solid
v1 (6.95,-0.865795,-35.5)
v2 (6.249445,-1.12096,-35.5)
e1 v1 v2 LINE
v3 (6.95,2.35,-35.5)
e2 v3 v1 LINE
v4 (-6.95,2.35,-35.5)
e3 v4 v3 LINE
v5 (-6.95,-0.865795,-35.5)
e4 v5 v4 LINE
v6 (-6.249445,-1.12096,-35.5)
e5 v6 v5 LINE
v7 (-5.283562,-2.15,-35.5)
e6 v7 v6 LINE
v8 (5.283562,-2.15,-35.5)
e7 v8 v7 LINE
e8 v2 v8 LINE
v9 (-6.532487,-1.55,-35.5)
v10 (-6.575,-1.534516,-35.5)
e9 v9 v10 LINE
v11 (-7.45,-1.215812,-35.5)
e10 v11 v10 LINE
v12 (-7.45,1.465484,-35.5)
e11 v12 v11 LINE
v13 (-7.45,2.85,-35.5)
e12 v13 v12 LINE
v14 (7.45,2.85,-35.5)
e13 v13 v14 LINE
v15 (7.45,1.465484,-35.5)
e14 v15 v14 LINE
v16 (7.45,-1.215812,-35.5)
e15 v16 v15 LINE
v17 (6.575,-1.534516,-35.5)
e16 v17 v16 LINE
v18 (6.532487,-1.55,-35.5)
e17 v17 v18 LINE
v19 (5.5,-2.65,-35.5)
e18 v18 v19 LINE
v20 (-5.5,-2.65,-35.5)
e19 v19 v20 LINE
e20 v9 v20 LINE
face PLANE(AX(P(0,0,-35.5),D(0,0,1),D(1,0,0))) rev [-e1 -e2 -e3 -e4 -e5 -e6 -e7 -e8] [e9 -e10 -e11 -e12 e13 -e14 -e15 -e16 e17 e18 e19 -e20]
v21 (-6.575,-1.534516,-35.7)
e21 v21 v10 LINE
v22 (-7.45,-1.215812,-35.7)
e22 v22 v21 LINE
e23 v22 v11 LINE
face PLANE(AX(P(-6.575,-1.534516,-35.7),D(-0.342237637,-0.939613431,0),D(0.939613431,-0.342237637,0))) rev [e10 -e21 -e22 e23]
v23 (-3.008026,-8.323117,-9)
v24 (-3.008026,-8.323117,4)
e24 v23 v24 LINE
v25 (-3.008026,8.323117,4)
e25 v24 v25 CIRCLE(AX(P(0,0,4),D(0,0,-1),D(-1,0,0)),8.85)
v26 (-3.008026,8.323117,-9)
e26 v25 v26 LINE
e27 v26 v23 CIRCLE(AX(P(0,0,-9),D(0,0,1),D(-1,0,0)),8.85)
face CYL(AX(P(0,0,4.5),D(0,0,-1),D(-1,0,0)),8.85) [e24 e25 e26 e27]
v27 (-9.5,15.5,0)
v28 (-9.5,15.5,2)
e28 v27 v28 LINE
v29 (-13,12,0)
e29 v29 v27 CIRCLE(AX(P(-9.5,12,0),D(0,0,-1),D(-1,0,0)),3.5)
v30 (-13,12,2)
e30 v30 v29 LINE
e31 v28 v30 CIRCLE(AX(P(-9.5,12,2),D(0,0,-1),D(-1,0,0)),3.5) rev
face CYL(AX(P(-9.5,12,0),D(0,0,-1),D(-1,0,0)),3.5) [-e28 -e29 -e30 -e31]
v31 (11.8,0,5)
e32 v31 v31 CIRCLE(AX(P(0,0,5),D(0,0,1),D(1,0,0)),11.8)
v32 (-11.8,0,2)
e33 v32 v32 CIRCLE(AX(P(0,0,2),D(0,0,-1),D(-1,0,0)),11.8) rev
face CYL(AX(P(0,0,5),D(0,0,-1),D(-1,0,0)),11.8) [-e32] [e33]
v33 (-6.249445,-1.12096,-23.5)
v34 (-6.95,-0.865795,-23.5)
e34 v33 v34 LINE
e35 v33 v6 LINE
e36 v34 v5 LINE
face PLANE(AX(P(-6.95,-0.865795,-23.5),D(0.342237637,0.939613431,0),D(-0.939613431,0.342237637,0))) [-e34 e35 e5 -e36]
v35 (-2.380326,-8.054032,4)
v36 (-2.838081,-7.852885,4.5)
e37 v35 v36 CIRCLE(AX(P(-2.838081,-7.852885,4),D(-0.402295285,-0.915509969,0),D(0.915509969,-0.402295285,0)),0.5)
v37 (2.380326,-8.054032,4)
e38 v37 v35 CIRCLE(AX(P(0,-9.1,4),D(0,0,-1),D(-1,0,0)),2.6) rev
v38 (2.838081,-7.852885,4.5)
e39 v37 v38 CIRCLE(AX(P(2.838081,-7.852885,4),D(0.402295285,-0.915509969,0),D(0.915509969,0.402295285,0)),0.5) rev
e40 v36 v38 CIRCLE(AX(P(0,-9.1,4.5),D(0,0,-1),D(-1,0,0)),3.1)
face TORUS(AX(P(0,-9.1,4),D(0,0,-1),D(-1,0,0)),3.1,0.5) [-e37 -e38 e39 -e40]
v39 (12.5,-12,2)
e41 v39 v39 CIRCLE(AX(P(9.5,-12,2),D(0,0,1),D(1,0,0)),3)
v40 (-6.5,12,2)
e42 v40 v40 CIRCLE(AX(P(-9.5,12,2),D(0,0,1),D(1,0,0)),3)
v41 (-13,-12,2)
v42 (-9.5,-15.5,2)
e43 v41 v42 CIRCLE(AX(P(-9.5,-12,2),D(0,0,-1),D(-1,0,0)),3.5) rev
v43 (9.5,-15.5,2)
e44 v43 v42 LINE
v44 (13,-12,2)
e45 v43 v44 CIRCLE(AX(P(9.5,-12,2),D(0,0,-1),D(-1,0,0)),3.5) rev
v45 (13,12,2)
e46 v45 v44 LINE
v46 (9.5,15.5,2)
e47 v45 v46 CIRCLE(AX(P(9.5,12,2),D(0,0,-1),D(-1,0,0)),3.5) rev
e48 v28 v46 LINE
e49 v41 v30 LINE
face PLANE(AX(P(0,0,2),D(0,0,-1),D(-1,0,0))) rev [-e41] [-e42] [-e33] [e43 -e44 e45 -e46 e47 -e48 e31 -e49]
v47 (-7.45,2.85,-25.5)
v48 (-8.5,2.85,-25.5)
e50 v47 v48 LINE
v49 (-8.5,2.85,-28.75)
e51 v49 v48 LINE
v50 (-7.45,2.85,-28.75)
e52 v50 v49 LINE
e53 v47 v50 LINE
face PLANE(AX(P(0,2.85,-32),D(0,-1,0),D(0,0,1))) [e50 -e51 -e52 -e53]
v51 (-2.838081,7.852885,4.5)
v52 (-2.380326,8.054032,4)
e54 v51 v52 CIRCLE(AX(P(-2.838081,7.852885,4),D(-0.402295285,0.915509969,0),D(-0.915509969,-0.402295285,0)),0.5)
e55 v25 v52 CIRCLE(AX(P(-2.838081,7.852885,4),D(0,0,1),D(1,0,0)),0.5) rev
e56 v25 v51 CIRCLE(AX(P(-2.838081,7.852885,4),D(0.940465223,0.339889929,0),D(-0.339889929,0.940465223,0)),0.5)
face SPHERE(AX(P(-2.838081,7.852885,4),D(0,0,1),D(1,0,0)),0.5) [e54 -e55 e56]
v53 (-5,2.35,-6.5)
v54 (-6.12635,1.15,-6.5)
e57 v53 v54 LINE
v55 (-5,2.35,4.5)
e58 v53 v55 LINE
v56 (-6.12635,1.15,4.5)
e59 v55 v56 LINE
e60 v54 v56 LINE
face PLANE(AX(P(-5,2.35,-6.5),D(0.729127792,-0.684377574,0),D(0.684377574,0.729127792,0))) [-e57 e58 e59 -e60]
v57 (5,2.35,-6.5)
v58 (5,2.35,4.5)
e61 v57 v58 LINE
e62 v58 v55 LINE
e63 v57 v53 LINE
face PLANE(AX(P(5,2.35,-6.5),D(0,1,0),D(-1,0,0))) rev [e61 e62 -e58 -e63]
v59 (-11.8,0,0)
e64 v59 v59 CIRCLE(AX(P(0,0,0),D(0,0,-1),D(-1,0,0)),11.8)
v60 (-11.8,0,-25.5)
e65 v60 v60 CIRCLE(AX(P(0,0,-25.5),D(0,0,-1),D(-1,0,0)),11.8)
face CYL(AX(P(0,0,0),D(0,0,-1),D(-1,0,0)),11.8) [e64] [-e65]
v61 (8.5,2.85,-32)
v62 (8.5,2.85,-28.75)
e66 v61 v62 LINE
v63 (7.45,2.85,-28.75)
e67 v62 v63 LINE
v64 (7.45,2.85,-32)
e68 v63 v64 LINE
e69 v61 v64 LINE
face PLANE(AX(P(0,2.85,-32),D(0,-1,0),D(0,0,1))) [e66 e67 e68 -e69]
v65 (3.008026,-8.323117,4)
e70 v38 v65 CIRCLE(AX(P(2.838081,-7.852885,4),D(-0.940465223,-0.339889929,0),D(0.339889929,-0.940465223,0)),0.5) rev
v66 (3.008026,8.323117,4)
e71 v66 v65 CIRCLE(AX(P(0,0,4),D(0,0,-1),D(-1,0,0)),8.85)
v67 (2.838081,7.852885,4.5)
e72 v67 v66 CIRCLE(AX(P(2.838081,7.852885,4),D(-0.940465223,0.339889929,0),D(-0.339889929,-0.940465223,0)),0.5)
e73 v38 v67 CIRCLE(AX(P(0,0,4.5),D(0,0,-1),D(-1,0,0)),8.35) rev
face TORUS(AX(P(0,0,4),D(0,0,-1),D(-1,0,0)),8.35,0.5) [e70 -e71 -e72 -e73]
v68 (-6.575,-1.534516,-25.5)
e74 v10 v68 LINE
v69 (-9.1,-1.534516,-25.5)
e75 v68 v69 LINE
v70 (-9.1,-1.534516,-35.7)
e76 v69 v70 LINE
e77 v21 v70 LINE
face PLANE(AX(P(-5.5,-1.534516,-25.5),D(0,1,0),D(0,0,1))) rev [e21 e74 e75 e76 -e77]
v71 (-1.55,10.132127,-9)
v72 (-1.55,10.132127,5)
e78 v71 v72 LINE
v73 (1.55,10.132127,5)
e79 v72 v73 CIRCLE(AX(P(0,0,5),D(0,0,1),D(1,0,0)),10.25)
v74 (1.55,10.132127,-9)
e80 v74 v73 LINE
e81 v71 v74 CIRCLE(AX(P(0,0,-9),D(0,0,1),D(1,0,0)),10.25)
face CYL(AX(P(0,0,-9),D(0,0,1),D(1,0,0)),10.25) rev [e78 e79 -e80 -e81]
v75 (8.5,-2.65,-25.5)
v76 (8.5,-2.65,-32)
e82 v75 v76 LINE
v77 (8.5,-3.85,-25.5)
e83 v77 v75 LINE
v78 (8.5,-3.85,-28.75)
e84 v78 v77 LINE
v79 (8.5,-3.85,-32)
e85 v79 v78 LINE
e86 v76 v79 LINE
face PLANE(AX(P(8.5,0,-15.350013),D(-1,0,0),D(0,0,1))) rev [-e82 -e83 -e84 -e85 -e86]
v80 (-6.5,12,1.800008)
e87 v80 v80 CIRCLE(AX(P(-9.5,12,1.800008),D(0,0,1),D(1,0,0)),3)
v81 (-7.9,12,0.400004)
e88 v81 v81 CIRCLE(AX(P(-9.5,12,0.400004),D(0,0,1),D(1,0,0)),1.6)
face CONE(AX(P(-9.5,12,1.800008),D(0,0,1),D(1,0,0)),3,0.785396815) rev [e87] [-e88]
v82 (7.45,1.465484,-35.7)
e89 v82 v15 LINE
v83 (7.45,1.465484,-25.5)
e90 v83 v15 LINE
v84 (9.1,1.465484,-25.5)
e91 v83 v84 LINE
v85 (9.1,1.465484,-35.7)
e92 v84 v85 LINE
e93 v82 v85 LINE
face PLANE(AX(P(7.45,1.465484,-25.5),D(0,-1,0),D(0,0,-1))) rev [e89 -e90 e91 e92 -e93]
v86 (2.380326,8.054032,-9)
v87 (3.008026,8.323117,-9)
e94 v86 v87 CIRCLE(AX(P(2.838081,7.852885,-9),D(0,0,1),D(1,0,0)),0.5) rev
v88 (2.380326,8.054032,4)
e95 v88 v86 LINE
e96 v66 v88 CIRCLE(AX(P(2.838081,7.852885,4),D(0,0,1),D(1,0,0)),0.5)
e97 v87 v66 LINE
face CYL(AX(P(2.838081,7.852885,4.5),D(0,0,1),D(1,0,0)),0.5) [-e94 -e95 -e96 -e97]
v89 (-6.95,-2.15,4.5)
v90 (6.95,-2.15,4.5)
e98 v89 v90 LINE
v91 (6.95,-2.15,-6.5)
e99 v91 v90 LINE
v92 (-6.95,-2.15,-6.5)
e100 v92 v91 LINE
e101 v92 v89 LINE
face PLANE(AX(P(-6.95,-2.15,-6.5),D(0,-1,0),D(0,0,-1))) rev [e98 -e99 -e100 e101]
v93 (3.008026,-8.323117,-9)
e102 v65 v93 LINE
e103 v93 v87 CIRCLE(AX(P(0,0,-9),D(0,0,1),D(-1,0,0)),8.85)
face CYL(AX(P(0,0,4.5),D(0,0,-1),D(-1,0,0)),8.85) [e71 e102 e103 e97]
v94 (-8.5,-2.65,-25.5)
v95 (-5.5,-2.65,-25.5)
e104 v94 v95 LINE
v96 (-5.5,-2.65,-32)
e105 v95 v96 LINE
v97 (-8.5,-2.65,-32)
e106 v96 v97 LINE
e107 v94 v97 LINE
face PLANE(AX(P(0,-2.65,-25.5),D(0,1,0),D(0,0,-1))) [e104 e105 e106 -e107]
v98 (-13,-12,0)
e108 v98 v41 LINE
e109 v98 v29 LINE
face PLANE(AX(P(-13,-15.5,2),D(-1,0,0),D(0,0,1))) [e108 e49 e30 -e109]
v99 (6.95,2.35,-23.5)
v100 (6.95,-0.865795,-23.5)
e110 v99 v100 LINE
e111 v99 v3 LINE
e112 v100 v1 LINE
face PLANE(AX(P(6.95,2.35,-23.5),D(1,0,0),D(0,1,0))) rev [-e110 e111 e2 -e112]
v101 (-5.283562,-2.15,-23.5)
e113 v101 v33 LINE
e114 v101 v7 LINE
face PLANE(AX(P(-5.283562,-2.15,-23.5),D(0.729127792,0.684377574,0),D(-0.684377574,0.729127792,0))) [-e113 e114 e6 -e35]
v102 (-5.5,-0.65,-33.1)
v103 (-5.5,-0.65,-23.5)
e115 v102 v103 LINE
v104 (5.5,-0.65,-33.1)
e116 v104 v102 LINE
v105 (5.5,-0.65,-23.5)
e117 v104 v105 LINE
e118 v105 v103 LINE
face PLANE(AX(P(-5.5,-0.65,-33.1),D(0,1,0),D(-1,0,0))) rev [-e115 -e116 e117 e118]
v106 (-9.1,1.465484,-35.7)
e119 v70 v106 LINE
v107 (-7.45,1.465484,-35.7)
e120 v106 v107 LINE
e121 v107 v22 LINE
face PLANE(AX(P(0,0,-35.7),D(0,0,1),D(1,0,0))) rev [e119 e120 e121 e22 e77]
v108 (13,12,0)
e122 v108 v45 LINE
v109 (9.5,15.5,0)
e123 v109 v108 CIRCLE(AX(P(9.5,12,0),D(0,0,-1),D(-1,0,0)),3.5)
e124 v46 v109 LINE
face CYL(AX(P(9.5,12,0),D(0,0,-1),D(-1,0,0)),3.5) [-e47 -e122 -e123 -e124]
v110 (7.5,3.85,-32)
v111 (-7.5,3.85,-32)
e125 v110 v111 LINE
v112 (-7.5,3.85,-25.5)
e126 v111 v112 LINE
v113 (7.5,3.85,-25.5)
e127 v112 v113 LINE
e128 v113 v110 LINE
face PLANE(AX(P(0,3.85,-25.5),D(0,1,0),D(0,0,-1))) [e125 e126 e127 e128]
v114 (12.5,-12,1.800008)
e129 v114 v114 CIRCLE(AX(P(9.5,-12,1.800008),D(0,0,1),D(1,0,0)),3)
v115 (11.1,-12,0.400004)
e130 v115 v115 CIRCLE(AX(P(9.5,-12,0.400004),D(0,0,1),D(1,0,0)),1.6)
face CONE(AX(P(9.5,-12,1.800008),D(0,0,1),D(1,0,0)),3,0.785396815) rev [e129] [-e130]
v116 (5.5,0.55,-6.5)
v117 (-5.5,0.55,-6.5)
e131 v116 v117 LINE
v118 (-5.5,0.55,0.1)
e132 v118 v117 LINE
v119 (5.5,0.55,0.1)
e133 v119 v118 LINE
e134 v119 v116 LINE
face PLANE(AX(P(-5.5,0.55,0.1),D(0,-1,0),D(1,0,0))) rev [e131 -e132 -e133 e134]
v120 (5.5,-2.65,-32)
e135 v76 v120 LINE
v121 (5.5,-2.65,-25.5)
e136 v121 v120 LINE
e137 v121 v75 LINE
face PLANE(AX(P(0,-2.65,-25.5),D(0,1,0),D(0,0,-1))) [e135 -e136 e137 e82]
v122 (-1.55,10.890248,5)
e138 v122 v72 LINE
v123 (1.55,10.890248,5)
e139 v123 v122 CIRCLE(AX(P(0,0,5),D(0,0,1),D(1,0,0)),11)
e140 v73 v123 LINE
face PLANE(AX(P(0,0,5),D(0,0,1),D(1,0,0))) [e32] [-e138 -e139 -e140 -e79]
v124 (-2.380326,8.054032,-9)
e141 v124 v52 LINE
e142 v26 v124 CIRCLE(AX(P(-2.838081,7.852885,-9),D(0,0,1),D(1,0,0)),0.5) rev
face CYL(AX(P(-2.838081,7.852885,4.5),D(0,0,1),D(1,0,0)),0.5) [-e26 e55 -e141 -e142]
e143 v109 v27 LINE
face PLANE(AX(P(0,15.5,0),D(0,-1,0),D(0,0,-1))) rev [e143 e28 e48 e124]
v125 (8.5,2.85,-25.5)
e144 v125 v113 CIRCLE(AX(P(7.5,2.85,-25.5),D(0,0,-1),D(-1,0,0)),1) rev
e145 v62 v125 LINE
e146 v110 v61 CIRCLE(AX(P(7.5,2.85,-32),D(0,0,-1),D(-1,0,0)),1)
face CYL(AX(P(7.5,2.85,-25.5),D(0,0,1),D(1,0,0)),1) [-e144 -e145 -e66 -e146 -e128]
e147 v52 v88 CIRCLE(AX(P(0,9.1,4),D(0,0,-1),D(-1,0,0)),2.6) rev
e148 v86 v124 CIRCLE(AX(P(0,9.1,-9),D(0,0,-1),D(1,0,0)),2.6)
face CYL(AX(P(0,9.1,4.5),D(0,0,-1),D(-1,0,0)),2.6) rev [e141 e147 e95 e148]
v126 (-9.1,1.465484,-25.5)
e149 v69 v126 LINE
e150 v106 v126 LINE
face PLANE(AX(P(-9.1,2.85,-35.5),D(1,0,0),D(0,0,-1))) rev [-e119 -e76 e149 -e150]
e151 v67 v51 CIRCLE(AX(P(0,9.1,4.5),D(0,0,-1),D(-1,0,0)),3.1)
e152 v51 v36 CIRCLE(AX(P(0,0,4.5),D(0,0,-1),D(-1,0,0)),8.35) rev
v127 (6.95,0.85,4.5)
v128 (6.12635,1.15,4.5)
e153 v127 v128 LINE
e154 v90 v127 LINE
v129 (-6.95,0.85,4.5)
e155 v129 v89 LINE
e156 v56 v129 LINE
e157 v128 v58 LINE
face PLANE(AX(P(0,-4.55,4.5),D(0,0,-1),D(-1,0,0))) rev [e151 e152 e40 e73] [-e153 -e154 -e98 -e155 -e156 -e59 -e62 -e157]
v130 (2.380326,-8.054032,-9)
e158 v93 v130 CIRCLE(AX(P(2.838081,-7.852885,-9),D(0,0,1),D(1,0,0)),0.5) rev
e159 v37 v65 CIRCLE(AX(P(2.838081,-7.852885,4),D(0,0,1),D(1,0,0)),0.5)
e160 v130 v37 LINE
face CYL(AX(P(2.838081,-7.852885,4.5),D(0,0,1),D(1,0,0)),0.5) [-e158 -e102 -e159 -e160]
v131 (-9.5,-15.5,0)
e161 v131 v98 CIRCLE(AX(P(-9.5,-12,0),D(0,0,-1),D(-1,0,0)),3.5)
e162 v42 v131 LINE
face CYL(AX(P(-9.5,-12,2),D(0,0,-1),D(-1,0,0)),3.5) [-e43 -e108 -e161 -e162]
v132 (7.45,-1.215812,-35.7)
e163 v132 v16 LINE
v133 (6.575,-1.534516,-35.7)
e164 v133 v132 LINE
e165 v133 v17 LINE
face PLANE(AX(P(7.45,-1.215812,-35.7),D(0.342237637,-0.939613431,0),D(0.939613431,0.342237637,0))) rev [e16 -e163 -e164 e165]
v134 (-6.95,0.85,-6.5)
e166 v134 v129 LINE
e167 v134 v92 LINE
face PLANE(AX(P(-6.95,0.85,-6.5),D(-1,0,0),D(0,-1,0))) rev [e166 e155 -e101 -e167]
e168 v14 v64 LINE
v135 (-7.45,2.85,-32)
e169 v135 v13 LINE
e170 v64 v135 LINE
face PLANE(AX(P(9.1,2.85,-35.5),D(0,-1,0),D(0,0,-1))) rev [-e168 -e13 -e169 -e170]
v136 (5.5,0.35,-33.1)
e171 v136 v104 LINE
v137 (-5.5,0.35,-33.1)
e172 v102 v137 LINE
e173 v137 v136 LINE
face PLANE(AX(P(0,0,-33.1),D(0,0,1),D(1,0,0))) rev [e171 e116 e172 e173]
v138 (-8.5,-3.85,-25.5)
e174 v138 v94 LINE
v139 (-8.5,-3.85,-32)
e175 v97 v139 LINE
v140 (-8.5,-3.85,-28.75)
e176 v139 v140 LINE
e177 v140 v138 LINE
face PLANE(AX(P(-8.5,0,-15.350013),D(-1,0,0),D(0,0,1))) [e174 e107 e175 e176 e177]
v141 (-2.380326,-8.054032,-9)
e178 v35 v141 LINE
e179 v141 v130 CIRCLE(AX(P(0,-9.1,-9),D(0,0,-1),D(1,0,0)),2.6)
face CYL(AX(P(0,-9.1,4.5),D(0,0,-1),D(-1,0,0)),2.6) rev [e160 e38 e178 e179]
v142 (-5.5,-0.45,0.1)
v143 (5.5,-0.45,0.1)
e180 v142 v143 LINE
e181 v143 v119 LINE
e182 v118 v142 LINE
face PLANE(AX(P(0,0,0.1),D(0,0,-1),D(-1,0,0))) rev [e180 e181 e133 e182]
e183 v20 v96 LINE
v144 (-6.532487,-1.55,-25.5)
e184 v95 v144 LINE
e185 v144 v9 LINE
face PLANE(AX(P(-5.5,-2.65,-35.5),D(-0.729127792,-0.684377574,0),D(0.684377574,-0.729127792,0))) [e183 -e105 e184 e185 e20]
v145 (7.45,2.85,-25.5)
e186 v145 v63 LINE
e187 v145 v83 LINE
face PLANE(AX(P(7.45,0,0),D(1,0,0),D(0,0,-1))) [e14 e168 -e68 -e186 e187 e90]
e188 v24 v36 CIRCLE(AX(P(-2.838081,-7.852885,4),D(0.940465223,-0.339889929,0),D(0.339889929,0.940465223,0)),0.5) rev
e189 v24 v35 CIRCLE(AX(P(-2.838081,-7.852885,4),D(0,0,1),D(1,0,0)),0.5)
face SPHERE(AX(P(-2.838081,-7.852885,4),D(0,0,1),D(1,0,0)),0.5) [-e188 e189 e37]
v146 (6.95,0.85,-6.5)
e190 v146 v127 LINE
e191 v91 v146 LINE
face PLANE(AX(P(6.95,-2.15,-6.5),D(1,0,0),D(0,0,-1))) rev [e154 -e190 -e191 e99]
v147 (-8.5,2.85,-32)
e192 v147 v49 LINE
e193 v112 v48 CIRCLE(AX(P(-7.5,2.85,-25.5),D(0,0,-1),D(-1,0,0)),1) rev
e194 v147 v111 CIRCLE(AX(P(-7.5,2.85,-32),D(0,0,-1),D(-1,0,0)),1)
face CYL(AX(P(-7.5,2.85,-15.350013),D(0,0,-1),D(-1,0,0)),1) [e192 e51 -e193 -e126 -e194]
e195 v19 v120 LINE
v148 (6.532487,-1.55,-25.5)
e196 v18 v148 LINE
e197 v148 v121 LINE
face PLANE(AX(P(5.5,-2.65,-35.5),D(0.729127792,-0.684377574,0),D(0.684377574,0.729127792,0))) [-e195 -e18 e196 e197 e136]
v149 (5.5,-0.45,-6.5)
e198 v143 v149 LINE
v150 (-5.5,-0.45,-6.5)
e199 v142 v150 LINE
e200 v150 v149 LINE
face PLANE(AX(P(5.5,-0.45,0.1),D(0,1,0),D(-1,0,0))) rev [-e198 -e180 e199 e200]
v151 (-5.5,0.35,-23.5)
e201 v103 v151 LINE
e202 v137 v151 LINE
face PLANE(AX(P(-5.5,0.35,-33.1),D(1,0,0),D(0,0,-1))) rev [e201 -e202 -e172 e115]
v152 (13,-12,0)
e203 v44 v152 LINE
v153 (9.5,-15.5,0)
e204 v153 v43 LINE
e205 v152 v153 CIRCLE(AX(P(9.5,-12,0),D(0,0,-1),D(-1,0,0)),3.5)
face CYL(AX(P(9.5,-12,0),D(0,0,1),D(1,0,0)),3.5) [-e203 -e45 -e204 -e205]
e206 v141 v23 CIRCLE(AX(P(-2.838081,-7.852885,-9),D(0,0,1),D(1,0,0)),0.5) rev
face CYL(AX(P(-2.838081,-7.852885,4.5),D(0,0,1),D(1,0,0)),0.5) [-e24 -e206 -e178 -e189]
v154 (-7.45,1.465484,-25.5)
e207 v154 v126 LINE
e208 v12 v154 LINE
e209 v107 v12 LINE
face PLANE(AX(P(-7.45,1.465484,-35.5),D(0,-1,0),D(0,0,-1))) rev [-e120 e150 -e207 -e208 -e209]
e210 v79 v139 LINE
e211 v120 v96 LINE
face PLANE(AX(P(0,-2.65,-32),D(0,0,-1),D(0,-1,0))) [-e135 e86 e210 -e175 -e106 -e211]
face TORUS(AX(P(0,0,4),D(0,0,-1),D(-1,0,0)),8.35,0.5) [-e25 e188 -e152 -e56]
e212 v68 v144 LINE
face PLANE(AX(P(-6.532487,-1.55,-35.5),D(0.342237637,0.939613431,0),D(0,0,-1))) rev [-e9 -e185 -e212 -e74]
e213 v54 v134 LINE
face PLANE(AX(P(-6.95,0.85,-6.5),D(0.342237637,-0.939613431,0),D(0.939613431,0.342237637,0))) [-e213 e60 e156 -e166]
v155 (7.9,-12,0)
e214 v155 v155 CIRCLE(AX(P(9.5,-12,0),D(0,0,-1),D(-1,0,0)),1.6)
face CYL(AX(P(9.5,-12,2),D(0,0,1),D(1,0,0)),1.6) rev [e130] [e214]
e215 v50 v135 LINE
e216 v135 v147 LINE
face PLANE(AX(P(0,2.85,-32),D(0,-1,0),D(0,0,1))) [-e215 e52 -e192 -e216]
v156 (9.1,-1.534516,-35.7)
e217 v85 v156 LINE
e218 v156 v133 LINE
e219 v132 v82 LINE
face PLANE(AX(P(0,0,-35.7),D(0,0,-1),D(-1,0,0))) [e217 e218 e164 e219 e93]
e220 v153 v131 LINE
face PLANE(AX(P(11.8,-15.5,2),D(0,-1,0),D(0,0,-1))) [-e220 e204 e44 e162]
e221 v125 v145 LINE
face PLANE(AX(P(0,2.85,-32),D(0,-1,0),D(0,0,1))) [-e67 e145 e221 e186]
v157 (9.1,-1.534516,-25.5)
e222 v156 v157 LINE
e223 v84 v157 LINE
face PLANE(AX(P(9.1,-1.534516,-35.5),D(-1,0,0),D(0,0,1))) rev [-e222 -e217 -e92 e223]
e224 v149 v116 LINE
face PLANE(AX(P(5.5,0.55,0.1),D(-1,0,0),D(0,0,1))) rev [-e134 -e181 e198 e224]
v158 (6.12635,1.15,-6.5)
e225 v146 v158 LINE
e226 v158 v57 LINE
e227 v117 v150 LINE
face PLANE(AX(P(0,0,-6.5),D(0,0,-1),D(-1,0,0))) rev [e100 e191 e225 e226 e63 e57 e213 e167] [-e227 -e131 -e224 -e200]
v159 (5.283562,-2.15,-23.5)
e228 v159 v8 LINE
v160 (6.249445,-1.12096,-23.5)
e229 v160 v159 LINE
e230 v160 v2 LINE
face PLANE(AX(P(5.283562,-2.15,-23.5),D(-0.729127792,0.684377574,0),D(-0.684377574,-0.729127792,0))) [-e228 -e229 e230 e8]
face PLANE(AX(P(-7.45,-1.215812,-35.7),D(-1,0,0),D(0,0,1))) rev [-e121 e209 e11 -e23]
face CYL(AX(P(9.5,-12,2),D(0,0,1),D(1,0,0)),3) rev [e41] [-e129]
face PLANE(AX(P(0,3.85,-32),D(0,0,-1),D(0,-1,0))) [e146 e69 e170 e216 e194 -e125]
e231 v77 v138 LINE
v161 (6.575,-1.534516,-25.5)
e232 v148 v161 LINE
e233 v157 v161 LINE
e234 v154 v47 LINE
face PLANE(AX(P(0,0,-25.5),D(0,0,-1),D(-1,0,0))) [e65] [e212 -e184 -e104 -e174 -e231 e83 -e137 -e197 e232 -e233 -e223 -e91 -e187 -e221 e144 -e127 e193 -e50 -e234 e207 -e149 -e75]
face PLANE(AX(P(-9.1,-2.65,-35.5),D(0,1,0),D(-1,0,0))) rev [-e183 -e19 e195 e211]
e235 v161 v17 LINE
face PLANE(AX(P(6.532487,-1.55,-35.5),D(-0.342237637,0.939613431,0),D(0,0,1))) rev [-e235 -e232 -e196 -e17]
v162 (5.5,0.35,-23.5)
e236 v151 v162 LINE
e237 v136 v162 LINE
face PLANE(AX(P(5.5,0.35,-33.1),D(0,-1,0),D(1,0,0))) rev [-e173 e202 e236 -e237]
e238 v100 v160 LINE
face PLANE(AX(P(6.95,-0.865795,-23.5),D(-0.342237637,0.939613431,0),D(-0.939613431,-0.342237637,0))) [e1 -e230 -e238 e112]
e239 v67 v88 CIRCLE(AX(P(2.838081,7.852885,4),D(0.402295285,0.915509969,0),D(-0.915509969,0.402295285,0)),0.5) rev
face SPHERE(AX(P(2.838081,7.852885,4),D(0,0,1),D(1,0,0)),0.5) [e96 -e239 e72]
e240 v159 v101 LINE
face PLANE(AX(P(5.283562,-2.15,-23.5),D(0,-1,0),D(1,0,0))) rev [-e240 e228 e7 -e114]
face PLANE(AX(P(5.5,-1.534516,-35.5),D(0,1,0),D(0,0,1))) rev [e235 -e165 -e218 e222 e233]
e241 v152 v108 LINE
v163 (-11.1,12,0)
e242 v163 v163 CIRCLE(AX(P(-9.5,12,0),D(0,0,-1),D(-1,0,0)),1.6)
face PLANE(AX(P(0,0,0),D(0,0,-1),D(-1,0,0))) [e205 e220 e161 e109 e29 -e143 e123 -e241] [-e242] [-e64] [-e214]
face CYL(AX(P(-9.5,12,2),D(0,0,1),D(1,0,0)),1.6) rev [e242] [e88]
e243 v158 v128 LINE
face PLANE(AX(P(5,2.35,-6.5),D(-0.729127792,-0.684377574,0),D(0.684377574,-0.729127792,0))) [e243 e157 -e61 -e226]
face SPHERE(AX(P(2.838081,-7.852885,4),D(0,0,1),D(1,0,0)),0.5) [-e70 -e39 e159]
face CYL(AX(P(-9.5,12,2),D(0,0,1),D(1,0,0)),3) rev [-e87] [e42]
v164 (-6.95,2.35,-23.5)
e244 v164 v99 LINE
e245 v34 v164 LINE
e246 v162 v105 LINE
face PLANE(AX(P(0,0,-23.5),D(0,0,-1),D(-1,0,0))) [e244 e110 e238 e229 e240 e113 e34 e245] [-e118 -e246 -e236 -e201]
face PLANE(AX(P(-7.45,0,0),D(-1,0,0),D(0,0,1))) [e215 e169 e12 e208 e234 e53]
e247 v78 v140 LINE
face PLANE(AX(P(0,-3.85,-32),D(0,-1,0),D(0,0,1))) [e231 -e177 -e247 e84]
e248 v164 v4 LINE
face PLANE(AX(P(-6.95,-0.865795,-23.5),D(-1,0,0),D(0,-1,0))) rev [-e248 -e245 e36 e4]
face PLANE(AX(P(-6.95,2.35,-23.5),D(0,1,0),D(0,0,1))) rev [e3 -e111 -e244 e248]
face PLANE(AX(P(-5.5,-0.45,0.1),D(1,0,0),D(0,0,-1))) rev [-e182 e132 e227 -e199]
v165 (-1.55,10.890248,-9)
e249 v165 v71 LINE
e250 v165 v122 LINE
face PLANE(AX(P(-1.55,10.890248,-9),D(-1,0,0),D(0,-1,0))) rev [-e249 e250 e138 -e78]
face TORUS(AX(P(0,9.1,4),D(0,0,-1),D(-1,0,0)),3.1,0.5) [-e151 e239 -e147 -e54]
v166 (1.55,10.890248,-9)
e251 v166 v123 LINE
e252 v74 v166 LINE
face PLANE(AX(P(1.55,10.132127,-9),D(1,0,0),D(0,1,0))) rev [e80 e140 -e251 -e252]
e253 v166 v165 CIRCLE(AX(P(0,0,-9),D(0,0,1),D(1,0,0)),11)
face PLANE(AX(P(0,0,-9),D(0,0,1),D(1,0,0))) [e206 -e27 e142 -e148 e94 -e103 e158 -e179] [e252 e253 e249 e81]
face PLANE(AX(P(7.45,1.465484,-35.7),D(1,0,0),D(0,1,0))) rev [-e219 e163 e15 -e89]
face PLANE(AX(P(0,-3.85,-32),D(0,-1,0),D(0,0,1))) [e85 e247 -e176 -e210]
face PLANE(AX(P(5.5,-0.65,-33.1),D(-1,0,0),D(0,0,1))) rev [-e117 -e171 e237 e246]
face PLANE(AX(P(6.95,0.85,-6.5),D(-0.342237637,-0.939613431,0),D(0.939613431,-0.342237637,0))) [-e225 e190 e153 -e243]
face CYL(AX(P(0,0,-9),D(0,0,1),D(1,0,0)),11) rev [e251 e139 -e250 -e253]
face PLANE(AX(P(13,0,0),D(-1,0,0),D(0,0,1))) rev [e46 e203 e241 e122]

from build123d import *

# Parameters (mm, degrees)
ESQUISSE1_W                                 = 11.8
ESQUISSE1_H                                 = 25.5
ESQUISSE2_W                                 = 24.8
ESQUISSE2_H                                 = 27.3
BOSS_EXTRU_1_DEPTH                          = 2
ESQUISSE3_W                                 = 2
ESQUISSE3_H                                 = 27.3
BOSS_EXTRU_2_DEPTH                          = 1.2
BOSS_EXTRU_3_DEPTH                          = 10
ESQUISSE5_W                                 = 10
ESQUISSE5_H                                 = 1.115484429
ENL_V_MAT_EXTRU_1_DEPTH                     = 3.6
ESQUISSE6_W                                 = 10
ESQUISSE6_H                                 = 1.384515571
ENL_V_MAT_EXTRU_2_DEPTH                     = 1.65
ESQUISSE7_W                                 = 10
ESQUISSE7_H                                 = 1.384515571
ENL_V_MAT_EXTRU_3_DEPTH                     = 1.65
BOSS_EXTRU_4_DEPTH                          = 0.2
BOSS_EXTRU_5_DEPTH                          = 0.2
ESQUISSE10_W                                = 26
ESQUISSE10_H                                = 2
BOSS_EXTRU_6_DEPTH                          = 3.7
BOSS_EXTRU_7_START                          = 3
ESQUISSE11_R                                = 11.8
BOSS_EXTRU_7_DEPTH                          = 3
ENL_V_MAT_EXTRU_4_DEPTH                     = 14
BOSS_EXTRU_8_DEPTH                          = 13.5
ENL_V_MAT_EXTRU_5_DEPTH                     = 11
ESQUISSE15_W                                = 11
ESQUISSE15_H                                = 1
BOSS_EXTRU_9_DEPTH                          = 6.6
ENL_V_MAT_EXTRU_6_DEPTH                     = 12
ESQUISSE17_W                                = 11
ESQUISSE17_H                                = 1
BOSS_EXTRU_10_DEPTH                         = 9.6
D_POUILLE1_ANGLE                            = 20.013261752
D_POUILLE2_ANGLE                            = 20.013261752
D_POUILLE3_ANGLE                            = 20.013261752
D_POUILLE4_ANGLE                            = 20.013261752
D_POUILLE5_ANGLE                            = 43.186676481
D_POUILLE6_ANGLE                            = 43.186676481
D_POUILLE7_ANGLE                            = 43.186676481
FRAISAGE_POUR_VIS_T_TE_FRAIS_E_M31_AT_COUNT = 2
FRAISAGE_POUR_VIS_T_TE_FRAIS_E_M31_AT_PITCH = 30.61045573
NERVURE1_START                              = -8.5
NERVURE1_OUTLINE_W                          = 1
NERVURE1_OUTLINE_H                          = 6.5
NERVURE1_DEPTH                              = 17
NERVURE2_START                              = -8.5
NERVURE2_OUTLINE_W                          = 1.2
NERVURE2_OUTLINE_H                          = 6.5
NERVURE2_DEPTH                              = 17
CHANFREIN1_SIZE                             = 0.027978428
CHANFREIN1_SIZE2                            = 0.021236921
CHANFREIN2_SIZE                             = 0.027978428
CHANFREIN2_SIZE2                            = 0.021236921
CONG_1_R                                    = 0.5
CONG_2_R                                    = 1
CONG_3_R                                    = 3.5


# Read off the part's stored shape, not the designer's step: Nervure1, Nervure2
with BuildPart() as part:
    # Esquisse1 → Révolution1 (revolve)
    with BuildSketch(Plane.XZ, mode=Mode.PRIVATE) as r_volution1_sk:
        with Locations((5.9, -12.75)):
            Rectangle(ESQUISSE1_W, ESQUISSE1_H)
    revolve(r_volution1_sk.sketch.rotate(Axis((0, 0, 0), (0, 0, -1)), 180), axis=Axis((0, 0, 0), (0, 0, -1)))

    # Esquisse2 → Boss.-Extru.1 (add)
    with BuildSketch(Plane(origin=(0, 0, 0), x_dir=(-1, 0, 0), z_dir=(0, 0, -1))):
        with Locations((0.6, -1.85)):
            Rectangle(ESQUISSE2_W, ESQUISSE2_H)
    extrude(amount=-BOSS_EXTRU_1_DEPTH)

    # Esquisse3 → Boss.-Extru.2 (add)
    with BuildSketch(Plane(origin=(11.8, 0, 0), x_dir=(0, 0, -1), z_dir=(1, 0, 0))):
        with Locations((-1, -1.85)):
            Rectangle(ESQUISSE3_W, ESQUISSE3_H)
    extrude(amount=BOSS_EXTRU_2_DEPTH)

    # Esquisse4 → Boss.-Extru.3 (add)
    with BuildSketch(Plane(origin=(0, 0, -25.5), x_dir=(-1, 0, 0), z_dir=(0, 0, -1))):
        Polygon((-9.1, 2.85), (9.1, 2.85), (9.1, -2.65), (-5.5, -2.65), (-5.5, -1.534515571), (-9.1, -1.534515571), align=None)
    extrude(amount=BOSS_EXTRU_3_DEPTH)

    # Esquisse5 → Enlèv. mat.-Extru.1 (cut)
    with BuildSketch(Plane.ZY.offset(9.1)):
        with Locations((-30.5, -2.092257786)):
            Rectangle(ESQUISSE5_W, ESQUISSE5_H)
    extrude(amount=-ENL_V_MAT_EXTRU_1_DEPTH, mode=Mode.SUBTRACT)

    # Esquisse6 → Enlèv. mat.-Extru.2 (cut)
    with BuildSketch(Plane(origin=(9.1, 0, 0), x_dir=(0, 0, -1), z_dir=(1, 0, 0))):
        with Locations((30.5, 2.157742215)):
            Rectangle(ESQUISSE6_W, ESQUISSE6_H)
    extrude(amount=-ENL_V_MAT_EXTRU_2_DEPTH, mode=Mode.SUBTRACT)

    # Esquisse7 → Enlèv. mat.-Extru.3 (cut)
    with BuildSketch(Plane.ZY.offset(9.1)):
        with Locations((-30.5, 2.157742215)):
            Rectangle(ESQUISSE7_W, ESQUISSE7_H)
    extrude(amount=-ENL_V_MAT_EXTRU_3_DEPTH, mode=Mode.SUBTRACT)

    # Esquisse8 → Boss.-Extru.4 (add)
    with BuildSketch(Plane(origin=(0, 0, -35.5), x_dir=(-1, 0, 0), z_dir=(0, 0, -1))):
        Polygon((-6.575, -1.534515571), (-9.1, -1.534515571), (-9.1, 1.465484429), (-7.45, 1.465484429), (-7.45, -1.215812238), align=None)
    extrude(amount=BOSS_EXTRU_4_DEPTH)

    # Esquisse9 → Boss.-Extru.5 (add)
    with BuildSketch(Plane(origin=(0, 0, -35.5), x_dir=(-1, 0, 0), z_dir=(0, 0, -1))):
        Polygon((6.575, -1.534515571), (7.45, -1.215812238), (7.45, 1.465484429), (9.1, 1.465484429), (9.1, -1.534515571), align=None)
    extrude(amount=BOSS_EXTRU_5_DEPTH)

    # Esquisse10 → Boss.-Extru.6 (add)
    with BuildSketch(Plane(origin=(0, 11.8, 0), x_dir=(-1, 0, 0), z_dir=(0, 1, 0))):
        with Locations((0, 1)):
            Rectangle(ESQUISSE10_W, ESQUISSE10_H)
    extrude(amount=BOSS_EXTRU_6_DEPTH)

    # Esquisse11 → Boss.-Extru.7 (add)
    with BuildSketch(Plane.XY.offset(2).offset(BOSS_EXTRU_7_START)):
        with Locations(Location((0, 0, 0), (0, 0, 180))):
            Circle(ESQUISSE11_R)
    extrude(amount=-BOSS_EXTRU_7_DEPTH)

    # Esquisse12 → Enlèv. mat.-Extru.4 (cut)
    with BuildSketch(Plane.XY.offset(5)):
        with BuildLine():
            Line((1.55, 10.132127121), (1.55, 10.890247931))
            ThreePointArc((1.55, 10.890247931), (0, 11), (-1.55, 10.890247931))
            Line((-1.55, 10.890247931), (-1.55, 10.132127121))
            ThreePointArc((-1.55, 10.132127121), (0, -10.25), (1.55, 10.132127121))
        make_face()
    extrude(amount=-ENL_V_MAT_EXTRU_4_DEPTH, mode=Mode.SUBTRACT)

    # Esquisse13 → Boss.-Extru.8 (add)
    with BuildSketch(Plane.XY.offset(-9)):
        with BuildLine():
            ThreePointArc((2.525486644, -8.482005495), (0, -6.5), (-2.525486644, -8.482005495))
            ThreePointArc((-2.525486644, -8.482005495), (-8.85, 0), (-2.525486644, 8.482005495))
            ThreePointArc((-2.525486644, 8.482005495), (0, 6.5), (2.525486644, 8.482005495))
            ThreePointArc((2.525486644, 8.482005495), (8.85, 0), (2.525486644, -8.482005495))
        make_face()
    extrude(amount=BOSS_EXTRU_8_DEPTH)

    # Esquisse14 → Enlèv. mat.-Extru.5 (cut)
    with BuildSketch(Plane.XY.offset(4.5)):
        Polygon((5, 0.85), (5, 2.35), (-5, 2.35), (-5, 0.85), (-6.95, 0.85), (-6.95, -2.15), (6.95, -2.15), (6.95, 0.85), align=None)
    extrude(amount=-ENL_V_MAT_EXTRU_5_DEPTH, mode=Mode.SUBTRACT)

    # Esquisse15 → Boss.-Extru.9 (add)
    with BuildSketch(Plane.XY.offset(-6.5)):
        with Locations((0, 0.05)):
            Rectangle(ESQUISSE15_W, ESQUISSE15_H)
    extrude(amount=BOSS_EXTRU_9_DEPTH)

    # Esquisse16 → Enlèv. mat.-Extru.6 (cut)
    with BuildSketch(Plane(origin=(0, 0, -35.5), x_dir=(-1, 0, 0), z_dir=(0, 0, -1))):
        Polygon((5.283561654, -2.15), (5.283561654, -0.865794698), (6.95, -0.865794698), (6.95, 2.35), (-6.95, 2.35), (-6.95, -0.865794698), (-5.283561654, -0.865794698), (-5.283561654, -2.15), align=None)
    extrude(amount=-ENL_V_MAT_EXTRU_6_DEPTH, mode=Mode.SUBTRACT)

    # Esquisse17 → Boss.-Extru.10 (add)
    with BuildSketch(Plane(origin=(0, 0, -23.5), x_dir=(-1, 0, 0), z_dir=(0, 0, -1))):
        with Locations((0, -0.15)):
            Rectangle(ESQUISSE17_W, ESQUISSE17_H)
    extrude(amount=BOSS_EXTRU_10_DEPTH)

    # Dépouille1
    d_pouille1_faces = [part.faces().sort_by_distance(p)[0] for p in [
        (-6.116780827, -0.865794698, -29.5),
    ]]
    draft(d_pouille1_faces, Plane(origin=(-6.95, -0.865794698, -23.5), x_dir=(0, 1, 0), z_dir=(1, 0, 0)), D_POUILLE1_ANGLE)

    # Dépouille2
    d_pouille2_faces = [part.faces().sort_by_distance(p)[0] for p in [
        (6.116780827, -0.865794698, -29.5),
    ]]
    draft(d_pouille2_faces, Plane(origin=(6.95, 2.35, -23.5), x_dir=(0, -1, 0), z_dir=(-1, 0, 0)), D_POUILLE2_ANGLE)

    # Dépouille3
    d_pouille3_faces = [part.faces().sort_by_distance(p)[0] for p in [
        (-5.975, 0.85, -1),
    ]]
    draft(d_pouille3_faces, Plane(origin=(-6.95, 0.85, -6.5), x_dir=(0, 1, 0), z_dir=(1, 0, 0)), D_POUILLE3_ANGLE)

    # Dépouille4
    d_pouille4_faces = [part.faces().sort_by_distance(p)[0] for p in [
        (5.975, 0.85, -1),
    ]]
    draft(d_pouille4_faces, Plane(origin=(6.95, -2.15, -6.5), x_dir=(0, 0, -1), z_dir=(-1, 0, 0)), D_POUILLE4_ANGLE)

    # Dépouille5
    d_pouille5_faces = [part.faces().sort_by_distance(p)[0] for p in [
        (5.5, -2.092257785, -30.5),
        (-5.5, -2.092257785, -30.5),
    ]]
    draft(d_pouille5_faces, Plane(origin=(-9.1, -2.65, -35.5), x_dir=(-1, 0, 0), z_dir=(0, -1, 0)), D_POUILLE5_ANGLE)

    # Dépouille6
    d_pouille6_faces = [part.faces().sort_by_distance(p)[0] for p in [
        (-5.283561654, -1.811382752, -29.5),
        (5.283561654, -1.811382752, -29.5),
    ]]
    draft(d_pouille6_faces, Plane(origin=(5.283561654, -2.15, -23.5), x_dir=(1, 0, 0), z_dir=(0, 1, 0)), D_POUILLE6_ANGLE)

    # Dépouille7
    d_pouille7_faces = [part.faces().sort_by_distance(p)[0] for p in [
        (-5, 1.955126571, -1),
        (5, 1.955126571, -1),
    ]]
    draft(d_pouille7_faces, Plane(origin=(5, 2.35, -6.5), x_dir=(-1, 0, 0), z_dir=(0, -1, 0)), D_POUILLE7_ANGLE)

    # Esquisse18 → Fraisage pour vis à tête fraisée M31 (revolve, cut)
    with BuildSketch(Plane(origin=(-9.5, 12, 2), x_dir=(0, -1, 0), z_dir=(1, 0, 0))):
        Polygon((0, 0), (0, 37.700025), (1.6, 37.700025), (1.6, 1.599995685), (3, 0.19999191), (3, 0), align=None)
    fraisage_pour_vis_t_te_frais_e_m31 = revolve(axis=Axis((-9.5, 12, 8.35), (0, 0, -1)), mode=Mode.SUBTRACT)

    # Fraisage pour vis à tête fraisée M31 at: Fraisage pour vis à tête fraisée M31 ×2
    with Locations(*[Vector(0.6207029443655612, -0.7840458244617614, 0) * (i * FRAISAGE_POUR_VIS_T_TE_FRAIS_E_M31_AT_PITCH) for i in range(1, FRAISAGE_POUR_VIS_T_TE_FRAIS_E_M31_AT_COUNT)]):
        add(fraisage_pour_vis_t_te_frais_e_m31, mode=Mode.SUBTRACT)

    # Nervure1 outline → Nervure1 (add)
    with BuildSketch(Plane(origin=(0, 0, 0), x_dir=(0, -1, 0), z_dir=(-1, 0, 0)).offset(NERVURE1_START)):
        with Locations((-3.35, -28.75)):
            Rectangle(NERVURE1_OUTLINE_W, NERVURE1_OUTLINE_H)
    extrude(amount=NERVURE1_DEPTH)

    # Nervure2 outline → Nervure2 (add)
    with BuildSketch(Plane(origin=(0, 0, 0), x_dir=(0, -1, 0), z_dir=(-1, 0, 0)).offset(NERVURE2_START)):
        with Locations((3.25, -28.75)):
            Rectangle(NERVURE2_OUTLINE_W, NERVURE2_OUTLINE_H)
    extrude(amount=NERVURE2_DEPTH)

    # Chanfrein1
    chanfrein1_edges = [part.edges().sort_by_distance(p)[0] for p in [
        (6.547021572, -1.534515571, -30.5),
    ]]
    chanfrein1_side = [part.faces().sort_by_distance(p)[0] for p in [
        (7.823782137, -1.534515571, -30.598925344),
    ]]
    chamfer(chanfrein1_edges, length=CHANFREIN1_SIZE, length2=CHANFREIN1_SIZE2, reference=chanfrein1_side[0])

    # Chanfrein2
    chanfrein2_edges = [part.edges().sort_by_distance(p)[0] for p in [
        (-6.547021572, -1.534515571, -30.5),
    ]]
    chanfrein2_side = [part.faces().sort_by_distance(p)[0] for p in [
        (-7.823782137, -1.534515571, -30.598925344),
    ]]
    chamfer(chanfrein2_edges, length=CHANFREIN2_SIZE, length2=CHANFREIN2_SIZE2, reference=chanfrein2_side[0])

    # Congé1
    cong_1_edges = [part.edges().sort_by_distance(p)[0] for p in [
        (2.525486644, -8.482005495, -2.25),
        (2.525486644, 8.482005495, -2.25),
        (-2.525486644, 8.482005495, -2.25),
        (-2.525486644, -8.482005495, -2.25),
        (8.85, 0, 4.5),
        (0, 6.5, 4.5),
        (-8.85, 0, 4.5),
        (0, -6.5, 4.5),
    ]]
    fillet(cong_1_edges, radius=CONG_1_R)

    # Congé2
    cong_2_edges = [part.edges().sort_by_distance(p)[0] for p in [
        (8.5, 3.85, -28.75),
        (-8.5, 3.85, -28.75),
    ]]
    fillet(cong_2_edges, radius=CONG_2_R - 0.0001)  # a hair under: the kernel refuses the full size

    # Congé3
    cong_3_edges = [part.edges().sort_by_distance(p)[0] for p in [
        (-13, -15.5, 1),
        (13, 15.5, 1),
        (-13, 15.5, 1),
        (13, -15.5, 1),
    ]]
    fillet(cong_3_edges, radius=CONG_3_R)


solid = part.part
